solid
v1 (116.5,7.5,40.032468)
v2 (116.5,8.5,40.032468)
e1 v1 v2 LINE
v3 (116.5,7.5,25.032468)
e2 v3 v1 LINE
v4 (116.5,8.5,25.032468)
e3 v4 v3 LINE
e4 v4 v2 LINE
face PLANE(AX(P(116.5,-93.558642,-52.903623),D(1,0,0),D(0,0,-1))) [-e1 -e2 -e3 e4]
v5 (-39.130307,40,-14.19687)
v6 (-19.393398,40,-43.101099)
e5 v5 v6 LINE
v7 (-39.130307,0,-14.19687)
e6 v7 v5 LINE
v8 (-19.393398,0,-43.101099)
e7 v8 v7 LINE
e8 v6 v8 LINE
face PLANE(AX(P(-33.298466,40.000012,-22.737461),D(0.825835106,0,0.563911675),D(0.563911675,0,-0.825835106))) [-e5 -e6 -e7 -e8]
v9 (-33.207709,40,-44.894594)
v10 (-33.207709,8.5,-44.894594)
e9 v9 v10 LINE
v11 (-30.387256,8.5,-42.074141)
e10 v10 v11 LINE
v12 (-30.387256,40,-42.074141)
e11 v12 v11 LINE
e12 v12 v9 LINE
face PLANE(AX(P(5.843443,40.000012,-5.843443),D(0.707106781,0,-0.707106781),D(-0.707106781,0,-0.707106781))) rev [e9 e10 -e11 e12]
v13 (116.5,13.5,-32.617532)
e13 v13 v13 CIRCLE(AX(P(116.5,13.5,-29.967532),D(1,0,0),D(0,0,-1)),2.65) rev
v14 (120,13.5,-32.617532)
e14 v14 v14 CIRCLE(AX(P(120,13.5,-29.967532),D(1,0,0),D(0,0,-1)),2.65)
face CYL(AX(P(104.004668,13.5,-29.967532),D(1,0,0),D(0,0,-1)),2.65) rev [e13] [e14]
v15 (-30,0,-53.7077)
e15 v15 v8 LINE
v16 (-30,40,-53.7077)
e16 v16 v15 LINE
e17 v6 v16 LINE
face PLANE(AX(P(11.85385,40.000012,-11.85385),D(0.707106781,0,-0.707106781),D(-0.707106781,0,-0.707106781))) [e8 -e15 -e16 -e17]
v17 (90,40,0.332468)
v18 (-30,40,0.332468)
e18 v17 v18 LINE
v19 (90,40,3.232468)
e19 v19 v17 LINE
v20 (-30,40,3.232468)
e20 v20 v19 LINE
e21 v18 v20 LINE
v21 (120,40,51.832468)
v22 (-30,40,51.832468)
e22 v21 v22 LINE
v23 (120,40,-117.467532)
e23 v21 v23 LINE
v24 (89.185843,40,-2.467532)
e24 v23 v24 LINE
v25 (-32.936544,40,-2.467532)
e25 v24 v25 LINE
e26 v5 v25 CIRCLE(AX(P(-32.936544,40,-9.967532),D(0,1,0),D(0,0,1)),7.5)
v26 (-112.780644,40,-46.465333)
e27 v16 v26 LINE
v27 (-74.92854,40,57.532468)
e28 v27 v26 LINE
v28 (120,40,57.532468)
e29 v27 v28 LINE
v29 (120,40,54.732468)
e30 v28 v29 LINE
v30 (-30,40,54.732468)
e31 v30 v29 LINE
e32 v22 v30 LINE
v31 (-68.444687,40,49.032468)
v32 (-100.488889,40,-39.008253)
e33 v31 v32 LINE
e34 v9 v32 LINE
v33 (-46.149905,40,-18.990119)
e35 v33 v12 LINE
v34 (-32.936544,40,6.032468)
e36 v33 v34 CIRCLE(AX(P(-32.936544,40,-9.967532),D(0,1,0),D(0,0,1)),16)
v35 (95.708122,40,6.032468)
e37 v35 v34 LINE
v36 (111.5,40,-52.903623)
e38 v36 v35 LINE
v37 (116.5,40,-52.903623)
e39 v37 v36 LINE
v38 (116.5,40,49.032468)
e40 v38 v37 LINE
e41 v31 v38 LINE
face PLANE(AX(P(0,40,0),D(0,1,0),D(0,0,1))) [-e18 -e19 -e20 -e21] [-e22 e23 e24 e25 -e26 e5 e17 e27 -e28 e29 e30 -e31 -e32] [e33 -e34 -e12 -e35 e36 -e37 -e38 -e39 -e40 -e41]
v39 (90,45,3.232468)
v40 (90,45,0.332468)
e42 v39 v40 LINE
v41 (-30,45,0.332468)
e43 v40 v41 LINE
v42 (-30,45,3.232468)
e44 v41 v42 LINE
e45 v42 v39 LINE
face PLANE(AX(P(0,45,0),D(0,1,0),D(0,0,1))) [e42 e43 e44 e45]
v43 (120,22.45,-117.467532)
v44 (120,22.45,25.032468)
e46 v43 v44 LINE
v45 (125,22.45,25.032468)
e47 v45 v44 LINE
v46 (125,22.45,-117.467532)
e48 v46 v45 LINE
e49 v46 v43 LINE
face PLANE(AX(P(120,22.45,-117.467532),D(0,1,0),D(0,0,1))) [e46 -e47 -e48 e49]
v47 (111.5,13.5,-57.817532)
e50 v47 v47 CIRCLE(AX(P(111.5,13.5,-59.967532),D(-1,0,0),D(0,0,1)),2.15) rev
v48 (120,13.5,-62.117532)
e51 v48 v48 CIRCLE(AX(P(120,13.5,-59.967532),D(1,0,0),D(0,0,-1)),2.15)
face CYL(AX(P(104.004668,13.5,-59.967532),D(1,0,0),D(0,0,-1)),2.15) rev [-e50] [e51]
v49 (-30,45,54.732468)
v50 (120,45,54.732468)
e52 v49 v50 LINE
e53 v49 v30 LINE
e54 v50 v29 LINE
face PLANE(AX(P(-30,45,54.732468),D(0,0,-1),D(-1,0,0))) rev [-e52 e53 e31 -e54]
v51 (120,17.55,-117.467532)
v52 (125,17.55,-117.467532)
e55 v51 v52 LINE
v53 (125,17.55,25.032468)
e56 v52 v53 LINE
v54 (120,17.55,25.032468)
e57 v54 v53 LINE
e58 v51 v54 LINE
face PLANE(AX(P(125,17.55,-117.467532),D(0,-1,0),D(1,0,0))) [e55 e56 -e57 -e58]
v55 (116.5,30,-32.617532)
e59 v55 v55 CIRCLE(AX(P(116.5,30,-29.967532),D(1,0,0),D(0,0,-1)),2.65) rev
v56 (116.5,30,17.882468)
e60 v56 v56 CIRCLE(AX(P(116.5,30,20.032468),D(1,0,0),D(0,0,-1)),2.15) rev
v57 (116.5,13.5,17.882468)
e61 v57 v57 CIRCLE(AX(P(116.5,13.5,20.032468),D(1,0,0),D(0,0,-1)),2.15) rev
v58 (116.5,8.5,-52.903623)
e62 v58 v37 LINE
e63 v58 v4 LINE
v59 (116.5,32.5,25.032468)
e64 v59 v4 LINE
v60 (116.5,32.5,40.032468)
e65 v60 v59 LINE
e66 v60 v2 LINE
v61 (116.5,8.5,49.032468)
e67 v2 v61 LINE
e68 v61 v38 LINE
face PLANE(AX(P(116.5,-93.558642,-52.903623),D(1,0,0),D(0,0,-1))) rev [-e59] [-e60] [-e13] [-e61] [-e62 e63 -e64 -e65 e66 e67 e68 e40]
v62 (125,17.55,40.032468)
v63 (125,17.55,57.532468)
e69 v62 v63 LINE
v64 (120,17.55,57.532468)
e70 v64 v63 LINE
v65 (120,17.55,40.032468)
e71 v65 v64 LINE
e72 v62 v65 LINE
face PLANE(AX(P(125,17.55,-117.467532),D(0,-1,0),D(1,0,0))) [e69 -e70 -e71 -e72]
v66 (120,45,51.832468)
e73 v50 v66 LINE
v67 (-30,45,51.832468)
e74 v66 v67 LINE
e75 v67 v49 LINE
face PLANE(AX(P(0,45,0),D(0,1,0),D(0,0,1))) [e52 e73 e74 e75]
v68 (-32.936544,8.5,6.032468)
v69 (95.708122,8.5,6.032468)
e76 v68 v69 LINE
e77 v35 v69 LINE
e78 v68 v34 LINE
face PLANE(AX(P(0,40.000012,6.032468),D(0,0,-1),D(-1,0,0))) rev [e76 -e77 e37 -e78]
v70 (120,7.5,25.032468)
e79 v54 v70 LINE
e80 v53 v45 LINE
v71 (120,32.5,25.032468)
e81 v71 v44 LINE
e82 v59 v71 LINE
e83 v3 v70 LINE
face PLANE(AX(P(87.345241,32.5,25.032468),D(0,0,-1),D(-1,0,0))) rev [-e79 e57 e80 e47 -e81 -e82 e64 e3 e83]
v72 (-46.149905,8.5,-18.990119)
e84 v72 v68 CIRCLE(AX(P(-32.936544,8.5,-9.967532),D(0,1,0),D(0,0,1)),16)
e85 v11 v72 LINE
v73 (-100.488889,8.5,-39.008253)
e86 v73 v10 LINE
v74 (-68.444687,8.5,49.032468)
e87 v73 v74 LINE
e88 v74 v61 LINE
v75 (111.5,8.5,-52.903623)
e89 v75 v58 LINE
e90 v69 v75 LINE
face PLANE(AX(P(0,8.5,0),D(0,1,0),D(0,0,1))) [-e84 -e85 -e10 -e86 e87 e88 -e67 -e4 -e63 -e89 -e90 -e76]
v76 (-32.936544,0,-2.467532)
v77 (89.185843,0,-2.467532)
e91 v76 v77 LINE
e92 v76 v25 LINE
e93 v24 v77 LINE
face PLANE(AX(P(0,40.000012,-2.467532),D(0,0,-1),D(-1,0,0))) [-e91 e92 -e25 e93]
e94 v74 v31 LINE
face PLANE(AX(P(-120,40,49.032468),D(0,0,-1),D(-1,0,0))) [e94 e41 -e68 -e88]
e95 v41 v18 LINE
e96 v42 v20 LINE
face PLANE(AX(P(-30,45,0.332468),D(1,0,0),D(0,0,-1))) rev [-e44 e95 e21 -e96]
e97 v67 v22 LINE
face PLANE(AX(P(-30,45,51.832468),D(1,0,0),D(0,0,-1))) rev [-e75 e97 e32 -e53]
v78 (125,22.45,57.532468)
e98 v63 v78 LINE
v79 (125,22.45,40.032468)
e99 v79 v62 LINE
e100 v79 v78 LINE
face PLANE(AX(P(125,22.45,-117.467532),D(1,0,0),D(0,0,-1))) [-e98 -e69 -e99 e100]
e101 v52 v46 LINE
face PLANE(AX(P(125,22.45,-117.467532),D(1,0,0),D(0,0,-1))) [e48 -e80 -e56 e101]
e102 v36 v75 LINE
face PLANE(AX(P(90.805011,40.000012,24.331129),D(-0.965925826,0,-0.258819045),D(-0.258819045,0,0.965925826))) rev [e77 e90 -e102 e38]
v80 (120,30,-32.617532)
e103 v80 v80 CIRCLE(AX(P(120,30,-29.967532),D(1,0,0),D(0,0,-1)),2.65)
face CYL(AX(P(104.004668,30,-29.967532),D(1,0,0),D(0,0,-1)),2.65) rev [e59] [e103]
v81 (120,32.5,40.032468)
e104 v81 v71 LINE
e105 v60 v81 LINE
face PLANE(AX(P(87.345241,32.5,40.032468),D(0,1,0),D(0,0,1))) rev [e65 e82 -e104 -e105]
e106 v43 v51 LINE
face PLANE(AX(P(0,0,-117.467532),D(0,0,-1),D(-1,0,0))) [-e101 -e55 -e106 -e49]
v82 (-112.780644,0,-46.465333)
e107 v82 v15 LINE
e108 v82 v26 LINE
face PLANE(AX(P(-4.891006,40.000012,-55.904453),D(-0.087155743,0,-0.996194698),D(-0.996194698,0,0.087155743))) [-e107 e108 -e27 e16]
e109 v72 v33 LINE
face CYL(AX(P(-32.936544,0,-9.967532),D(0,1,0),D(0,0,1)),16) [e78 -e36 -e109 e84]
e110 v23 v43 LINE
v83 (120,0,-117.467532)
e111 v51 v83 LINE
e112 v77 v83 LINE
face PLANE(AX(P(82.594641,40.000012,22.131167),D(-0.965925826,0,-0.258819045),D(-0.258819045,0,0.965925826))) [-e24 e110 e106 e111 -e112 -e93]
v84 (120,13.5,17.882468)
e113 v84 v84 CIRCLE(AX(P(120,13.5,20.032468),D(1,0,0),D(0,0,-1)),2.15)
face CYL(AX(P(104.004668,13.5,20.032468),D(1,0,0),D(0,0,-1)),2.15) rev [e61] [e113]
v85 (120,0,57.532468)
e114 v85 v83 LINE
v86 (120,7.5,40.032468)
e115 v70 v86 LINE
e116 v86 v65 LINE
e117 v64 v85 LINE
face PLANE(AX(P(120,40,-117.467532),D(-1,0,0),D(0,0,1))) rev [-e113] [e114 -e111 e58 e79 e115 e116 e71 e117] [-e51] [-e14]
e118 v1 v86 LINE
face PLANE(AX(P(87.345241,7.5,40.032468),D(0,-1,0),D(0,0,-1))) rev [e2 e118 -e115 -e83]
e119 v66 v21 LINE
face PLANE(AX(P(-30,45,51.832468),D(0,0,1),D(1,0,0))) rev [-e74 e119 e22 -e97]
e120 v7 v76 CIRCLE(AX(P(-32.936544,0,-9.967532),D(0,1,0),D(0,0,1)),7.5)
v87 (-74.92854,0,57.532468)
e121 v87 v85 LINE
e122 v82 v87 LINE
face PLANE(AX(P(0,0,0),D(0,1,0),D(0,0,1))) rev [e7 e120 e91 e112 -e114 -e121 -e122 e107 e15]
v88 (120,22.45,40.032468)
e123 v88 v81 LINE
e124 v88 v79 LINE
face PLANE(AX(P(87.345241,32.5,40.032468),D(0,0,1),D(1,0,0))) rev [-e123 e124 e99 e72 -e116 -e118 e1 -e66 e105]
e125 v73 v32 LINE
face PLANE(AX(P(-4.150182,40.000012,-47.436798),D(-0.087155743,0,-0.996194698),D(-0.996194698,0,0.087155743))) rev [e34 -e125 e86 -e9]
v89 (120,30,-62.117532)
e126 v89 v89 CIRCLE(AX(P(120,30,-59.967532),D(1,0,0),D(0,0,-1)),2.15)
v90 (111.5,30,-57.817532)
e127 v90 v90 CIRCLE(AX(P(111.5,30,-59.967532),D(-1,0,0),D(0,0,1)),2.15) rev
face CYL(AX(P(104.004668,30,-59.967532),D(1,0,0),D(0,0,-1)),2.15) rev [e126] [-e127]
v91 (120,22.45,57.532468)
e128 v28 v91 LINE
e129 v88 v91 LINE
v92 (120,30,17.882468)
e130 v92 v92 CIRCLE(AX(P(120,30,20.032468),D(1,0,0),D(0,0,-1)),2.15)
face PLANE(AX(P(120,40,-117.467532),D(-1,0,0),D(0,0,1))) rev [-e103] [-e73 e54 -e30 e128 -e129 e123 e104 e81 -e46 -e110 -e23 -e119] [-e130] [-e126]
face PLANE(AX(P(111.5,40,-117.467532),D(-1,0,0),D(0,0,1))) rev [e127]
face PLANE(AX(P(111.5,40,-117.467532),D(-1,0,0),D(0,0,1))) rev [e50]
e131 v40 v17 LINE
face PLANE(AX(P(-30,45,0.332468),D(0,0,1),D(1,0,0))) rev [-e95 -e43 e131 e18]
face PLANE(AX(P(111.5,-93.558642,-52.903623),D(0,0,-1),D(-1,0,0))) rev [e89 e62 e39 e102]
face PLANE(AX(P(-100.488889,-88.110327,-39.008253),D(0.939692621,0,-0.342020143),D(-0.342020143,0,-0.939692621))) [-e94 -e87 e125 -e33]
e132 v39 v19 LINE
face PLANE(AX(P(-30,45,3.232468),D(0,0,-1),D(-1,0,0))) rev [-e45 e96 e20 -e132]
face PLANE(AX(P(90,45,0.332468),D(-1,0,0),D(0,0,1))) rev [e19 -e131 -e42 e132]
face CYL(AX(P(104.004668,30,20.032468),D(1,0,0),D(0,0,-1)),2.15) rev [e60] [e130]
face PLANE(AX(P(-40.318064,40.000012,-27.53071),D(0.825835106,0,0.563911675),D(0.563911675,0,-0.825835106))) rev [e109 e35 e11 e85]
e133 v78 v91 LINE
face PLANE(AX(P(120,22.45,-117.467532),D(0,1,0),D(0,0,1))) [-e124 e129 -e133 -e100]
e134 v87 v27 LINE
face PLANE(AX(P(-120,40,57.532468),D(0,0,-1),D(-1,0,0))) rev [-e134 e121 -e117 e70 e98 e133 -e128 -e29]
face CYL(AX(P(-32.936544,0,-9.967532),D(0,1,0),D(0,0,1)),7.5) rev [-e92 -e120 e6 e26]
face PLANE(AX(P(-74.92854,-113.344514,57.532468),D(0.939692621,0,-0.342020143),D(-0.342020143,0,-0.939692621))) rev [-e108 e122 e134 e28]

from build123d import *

# Parameters (mm, degrees)
SKETCH1_W               = 240
SKETCH1_H               = 175
BOSS_EXTRUDE1_DEPTH     = 40
CUT_EXTRUDE1_DEPTH      = 173.622771337
CUT_EXTRUDE1_DEPTH_BACK = 40
SKETCH3_W               = 5
SKETCH3_H               = 4.9
BOSS_EXTRUDE2_DEPTH     = 175
SHELL1_START            = 8.5
SHELL1_DEPTH            = 31.5
SKETCH4_R               = 2.65
SKETCH4_R_2             = 2.15
CUT_EXTRUDE2_DEPTH      = 8.5
CUT_EXTRUDE3_START      = -31.5
SKETCH5_W               = 5
SKETCH5_H               = 101.936090041
CUT_EXTRUDE3_DEPTH      = 31.5
SKETCH6_W               = 150
SKETCH6_H               = 2.9
SKETCH6_W_2             = 120
BOSS_EXTRUDE3_DEPTH     = 5
CUT_EXTRUDE4_REACH      = 277.406
SKETCH8_W               = 15
SKETCH8_H               = 25
BOSS_EXTRUDE4_DEPTH     = 10
CUT_EXTRUDE5_START      = -50
CUT_EXTRUDE5_DEPTH      = 50
BOSS_EXTRUDE5_DEPTH     = 31.5


# Read off the part's stored shape, not the designer's step: Shell1
with BuildPart() as part:
    # Sketch1 → Boss-Extrude1 (new body)
    with BuildSketch(Plane(origin=(0, 0, 0), x_dir=(1, 0, 0), z_dir=(0, 1, 0))):
        with Locations((0, 29.967532468)):
            Rectangle(SKETCH1_W, SKETCH1_H)
    extrude(amount=BOSS_EXTRUDE1_DEPTH)

    # Sketch2 → Cut-Extrude1 (cut, two sides: drawn at the far end of the back side and taken through both)
    with BuildSketch(Plane(origin=(0, 40, 0), x_dir=(1, 0, 0), z_dir=(0, 1, 0)).offset(-CUT_EXTRUDE1_DEPTH_BACK)):
        with BuildLine():
            Line((724.053869611, -57.532467532), (120, -57.532467532))
            Line((120, -57.532467532), (-82.377784234, -57.532467532))
            Line((-82.377784234, -57.532467532), (-120, 45.833720754))
            Line((-120, 45.833720754), (-30, 53.707700471))
            Line((-30, 53.707700471), (-19.393398282, 43.101098754))
            Line((-19.393398282, 43.101098754), (-39.130306901, 14.196870029))
            ThreePointArc((-39.130306901, 14.196870029), (-39.568663615, 6.465392529), (-32.936543603, 2.467532468))
            Line((-32.936543603, 2.467532468), (89.18584287, 2.467532468))
            Line((89.18584287, 2.467532468), (120, 117.467532468))
            Line((120, 117.467532468), (276.340645723, 700.938765595))
            Line((276.340645723, 700.938765595), (-764.036200619, 86.821246577))
            Line((-764.036200619, 86.821246577), (-316.322976731, -671.64998655))
            Line((-316.322976731, -671.64998655), (724.053869611, -57.532467532))
        make_face()
    extrude(amount=CUT_EXTRUDE1_DEPTH + CUT_EXTRUDE1_DEPTH_BACK, mode=Mode.SUBTRACT)

    # Sketch3 → Boss-Extrude2 (add)
    with BuildSketch(Plane.XY.offset(57.532467532)):
        with Locations((122.5, 20)):
            Rectangle(SKETCH3_W, SKETCH3_H)
    extrude(amount=-BOSS_EXTRUDE2_DEPTH)

    # Shell1 outline → Shell1 (cut)
    with BuildSketch(Plane(origin=(0, 0, 0), x_dir=(1, 0, 0), z_dir=(0, 1, 0)).offset(SHELL1_START)):
        with BuildLine():
            Line((111.5, -49.032467532), (111.5, 52.903622509))
            Line((111.5, 52.903622509), (95.708122268, -6.032467532))
            Line((95.708122268, -6.032467532), (-32.936543603, -6.032467532))
            ThreePointArc((-32.936543603, -6.032467532), (-47.085066295, 2.4963006), (-46.149905305, 18.990119265))
            Line((-46.149905305, 18.990119265), (-30.387255785, 42.074140976))
            Line((-30.387255785, 42.074140976), (-33.207708529, 44.89459372))
            Line((-33.207708529, 44.89459372), (-108.223913428, 38.331526211))
            Line((-108.223913428, 38.331526211), (-76.426020159, -49.032467532))
            Line((-76.426020159, -49.032467532), (111.5, -49.032467532))
        make_face()
    extrude(amount=SHELL1_DEPTH, mode=Mode.SUBTRACT)

    # Sketch4 → Cut-Extrude2 (cut)
    with BuildSketch(Plane(origin=(120, 0, 0), x_dir=(0, 0, -1), z_dir=(1, 0, 0))):
        with Locations((29.967532468, 30)):
            Circle(SKETCH4_R)
        with Locations((59.967532468, 30)):
            Circle(SKETCH4_R_2)
        with Locations((-20.032467532, 30)):
            Circle(SKETCH4_R_2)
        with Locations((29.967532468, 13.5)):
            Circle(SKETCH4_R)
        with Locations((59.967532468, 13.5)):
            Circle(SKETCH4_R_2)
        with Locations((-20.032467532, 13.5)):
            Circle(SKETCH4_R_2)
    extrude(amount=-CUT_EXTRUDE2_DEPTH, mode=Mode.SUBTRACT)

    # Sketch5 → Cut-Extrude3 (cut)
    with BuildSketch(Plane(origin=(0, 40, 0), x_dir=(1, 0, 0), z_dir=(0, 1, 0)).offset(CUT_EXTRUDE3_START)):
        with Locations((114, 1.935577488)):
            Rectangle(SKETCH5_W, SKETCH5_H)
    extrude(amount=CUT_EXTRUDE3_DEPTH, mode=Mode.SUBTRACT)

    # Sketch6 → Boss-Extrude3 (add)
    with BuildSketch(Plane(origin=(0, 40, 0), x_dir=(1, 0, 0), z_dir=(0, 1, 0))):
        with Locations((45, -53.282467532)):
            Rectangle(SKETCH6_W, SKETCH6_H)
        with Locations((30, -1.782467532)):
            Rectangle(SKETCH6_W_2, SKETCH6_H)
    extrude(amount=BOSS_EXTRUDE3_DEPTH)

    # Cut-Extrude4: up to this face of the body (flat: up to its plane)
    cut_extrude4_end = Plane(part.part.faces().sort_by_distance((116.5, 24.308295021, -1.744734026))[0])
    # Sketch8 → Cut-Extrude4 (cut, up to the picked face)
    with BuildSketch(Plane(origin=(125, 0, 0), x_dir=(0, 0, -1), z_dir=(1, 0, 0)), mode=Mode.PRIVATE) as cut_extrude4_sk1:
        with Locations((-32.532467532, 20)):
            Rectangle(SKETCH8_W, SKETCH8_H)
    cut_extrude4_tool1 = split(extrude(cut_extrude4_sk1.sketch, amount=-CUT_EXTRUDE4_REACH, mode=Mode.PRIVATE), bisect_by=cut_extrude4_end, keep=Keep.BOTH, mode=Mode.PRIVATE)
    add(cut_extrude4_tool1.solids().sort_by(Axis((125, 20, 32.532468), (-1, 0, 0)))[0], mode=Mode.SUBTRACT)


with BuildPart() as body_2:
    # Sketch9 → Boss-Extrude4 (new body)
    with BuildSketch(Plane(origin=(0, 40, 0), x_dir=(1, 0, 0), z_dir=(0, 1, 0))):
        with BuildLine():
            Line((120, -57.532467532), (120, 117.467532468))
            Line((120, 117.467532468), (89.18584287, 2.467532468))
            Line((89.18584287, 2.467532468), (-32.936543603, 2.467532468))
            ThreePointArc((-32.936543603, 2.467532468), (-39.568663615, 6.465392529), (-39.130306901, 14.196870029))
            Line((-39.130306901, 14.196870029), (-19.393398282, 43.101098754))
            Line((-19.393398282, 43.101098754), (-30, 53.707700471))
            Line((-30, 53.707700471), (-120, 45.833720754))
            Line((-120, 45.833720754), (-82.377784234, -57.532467532))
            Line((-82.377784234, -57.532467532), (120, -57.532467532))
        make_face()
    extrude(amount=BOSS_EXTRUDE4_DEPTH)


with BuildPart() as cut_extrude5_tool:
    # Sketch10 → Cut-Extrude5 (new body)
    with BuildSketch(Plane(origin=(0, 50, 0), x_dir=(1, 0, 0), z_dir=(0, 1, 0)).offset(CUT_EXTRUDE5_START)):
        Polygon((-120, 45.833720754), (-112.780643506, 46.465332605), (-74.928539827, -57.532467532), (-82.377784234, -57.532467532), align=None)
    extrude(amount=CUT_EXTRUDE5_DEPTH)


with BuildPart() as part_1:
    add(part.part)

    # Cut-Extrude5: cut by cut_extrude5_tool
    add(cut_extrude5_tool.part, mode=Mode.SUBTRACT)

    # Sketch11 → Boss-Extrude5 (add)
    with BuildSketch(Plane(origin=(0, 40, 0), x_dir=(1, 0, 0), z_dir=(0, 1, 0))):
        Polygon((-108.223913428, 38.331526211), (-100.488888614, 39.008253194), (-68.444686866, -49.032467532), (-76.426020159, -49.032467532), align=None)
    extrude(amount=-BOSS_EXTRUDE5_DEPTH)


with BuildPart() as body_2_1:
    add(body_2.part)

    # Cut-Extrude5: cut by cut_extrude5_tool
    add(cut_extrude5_tool.part, mode=Mode.SUBTRACT)


solid = part_1.part
